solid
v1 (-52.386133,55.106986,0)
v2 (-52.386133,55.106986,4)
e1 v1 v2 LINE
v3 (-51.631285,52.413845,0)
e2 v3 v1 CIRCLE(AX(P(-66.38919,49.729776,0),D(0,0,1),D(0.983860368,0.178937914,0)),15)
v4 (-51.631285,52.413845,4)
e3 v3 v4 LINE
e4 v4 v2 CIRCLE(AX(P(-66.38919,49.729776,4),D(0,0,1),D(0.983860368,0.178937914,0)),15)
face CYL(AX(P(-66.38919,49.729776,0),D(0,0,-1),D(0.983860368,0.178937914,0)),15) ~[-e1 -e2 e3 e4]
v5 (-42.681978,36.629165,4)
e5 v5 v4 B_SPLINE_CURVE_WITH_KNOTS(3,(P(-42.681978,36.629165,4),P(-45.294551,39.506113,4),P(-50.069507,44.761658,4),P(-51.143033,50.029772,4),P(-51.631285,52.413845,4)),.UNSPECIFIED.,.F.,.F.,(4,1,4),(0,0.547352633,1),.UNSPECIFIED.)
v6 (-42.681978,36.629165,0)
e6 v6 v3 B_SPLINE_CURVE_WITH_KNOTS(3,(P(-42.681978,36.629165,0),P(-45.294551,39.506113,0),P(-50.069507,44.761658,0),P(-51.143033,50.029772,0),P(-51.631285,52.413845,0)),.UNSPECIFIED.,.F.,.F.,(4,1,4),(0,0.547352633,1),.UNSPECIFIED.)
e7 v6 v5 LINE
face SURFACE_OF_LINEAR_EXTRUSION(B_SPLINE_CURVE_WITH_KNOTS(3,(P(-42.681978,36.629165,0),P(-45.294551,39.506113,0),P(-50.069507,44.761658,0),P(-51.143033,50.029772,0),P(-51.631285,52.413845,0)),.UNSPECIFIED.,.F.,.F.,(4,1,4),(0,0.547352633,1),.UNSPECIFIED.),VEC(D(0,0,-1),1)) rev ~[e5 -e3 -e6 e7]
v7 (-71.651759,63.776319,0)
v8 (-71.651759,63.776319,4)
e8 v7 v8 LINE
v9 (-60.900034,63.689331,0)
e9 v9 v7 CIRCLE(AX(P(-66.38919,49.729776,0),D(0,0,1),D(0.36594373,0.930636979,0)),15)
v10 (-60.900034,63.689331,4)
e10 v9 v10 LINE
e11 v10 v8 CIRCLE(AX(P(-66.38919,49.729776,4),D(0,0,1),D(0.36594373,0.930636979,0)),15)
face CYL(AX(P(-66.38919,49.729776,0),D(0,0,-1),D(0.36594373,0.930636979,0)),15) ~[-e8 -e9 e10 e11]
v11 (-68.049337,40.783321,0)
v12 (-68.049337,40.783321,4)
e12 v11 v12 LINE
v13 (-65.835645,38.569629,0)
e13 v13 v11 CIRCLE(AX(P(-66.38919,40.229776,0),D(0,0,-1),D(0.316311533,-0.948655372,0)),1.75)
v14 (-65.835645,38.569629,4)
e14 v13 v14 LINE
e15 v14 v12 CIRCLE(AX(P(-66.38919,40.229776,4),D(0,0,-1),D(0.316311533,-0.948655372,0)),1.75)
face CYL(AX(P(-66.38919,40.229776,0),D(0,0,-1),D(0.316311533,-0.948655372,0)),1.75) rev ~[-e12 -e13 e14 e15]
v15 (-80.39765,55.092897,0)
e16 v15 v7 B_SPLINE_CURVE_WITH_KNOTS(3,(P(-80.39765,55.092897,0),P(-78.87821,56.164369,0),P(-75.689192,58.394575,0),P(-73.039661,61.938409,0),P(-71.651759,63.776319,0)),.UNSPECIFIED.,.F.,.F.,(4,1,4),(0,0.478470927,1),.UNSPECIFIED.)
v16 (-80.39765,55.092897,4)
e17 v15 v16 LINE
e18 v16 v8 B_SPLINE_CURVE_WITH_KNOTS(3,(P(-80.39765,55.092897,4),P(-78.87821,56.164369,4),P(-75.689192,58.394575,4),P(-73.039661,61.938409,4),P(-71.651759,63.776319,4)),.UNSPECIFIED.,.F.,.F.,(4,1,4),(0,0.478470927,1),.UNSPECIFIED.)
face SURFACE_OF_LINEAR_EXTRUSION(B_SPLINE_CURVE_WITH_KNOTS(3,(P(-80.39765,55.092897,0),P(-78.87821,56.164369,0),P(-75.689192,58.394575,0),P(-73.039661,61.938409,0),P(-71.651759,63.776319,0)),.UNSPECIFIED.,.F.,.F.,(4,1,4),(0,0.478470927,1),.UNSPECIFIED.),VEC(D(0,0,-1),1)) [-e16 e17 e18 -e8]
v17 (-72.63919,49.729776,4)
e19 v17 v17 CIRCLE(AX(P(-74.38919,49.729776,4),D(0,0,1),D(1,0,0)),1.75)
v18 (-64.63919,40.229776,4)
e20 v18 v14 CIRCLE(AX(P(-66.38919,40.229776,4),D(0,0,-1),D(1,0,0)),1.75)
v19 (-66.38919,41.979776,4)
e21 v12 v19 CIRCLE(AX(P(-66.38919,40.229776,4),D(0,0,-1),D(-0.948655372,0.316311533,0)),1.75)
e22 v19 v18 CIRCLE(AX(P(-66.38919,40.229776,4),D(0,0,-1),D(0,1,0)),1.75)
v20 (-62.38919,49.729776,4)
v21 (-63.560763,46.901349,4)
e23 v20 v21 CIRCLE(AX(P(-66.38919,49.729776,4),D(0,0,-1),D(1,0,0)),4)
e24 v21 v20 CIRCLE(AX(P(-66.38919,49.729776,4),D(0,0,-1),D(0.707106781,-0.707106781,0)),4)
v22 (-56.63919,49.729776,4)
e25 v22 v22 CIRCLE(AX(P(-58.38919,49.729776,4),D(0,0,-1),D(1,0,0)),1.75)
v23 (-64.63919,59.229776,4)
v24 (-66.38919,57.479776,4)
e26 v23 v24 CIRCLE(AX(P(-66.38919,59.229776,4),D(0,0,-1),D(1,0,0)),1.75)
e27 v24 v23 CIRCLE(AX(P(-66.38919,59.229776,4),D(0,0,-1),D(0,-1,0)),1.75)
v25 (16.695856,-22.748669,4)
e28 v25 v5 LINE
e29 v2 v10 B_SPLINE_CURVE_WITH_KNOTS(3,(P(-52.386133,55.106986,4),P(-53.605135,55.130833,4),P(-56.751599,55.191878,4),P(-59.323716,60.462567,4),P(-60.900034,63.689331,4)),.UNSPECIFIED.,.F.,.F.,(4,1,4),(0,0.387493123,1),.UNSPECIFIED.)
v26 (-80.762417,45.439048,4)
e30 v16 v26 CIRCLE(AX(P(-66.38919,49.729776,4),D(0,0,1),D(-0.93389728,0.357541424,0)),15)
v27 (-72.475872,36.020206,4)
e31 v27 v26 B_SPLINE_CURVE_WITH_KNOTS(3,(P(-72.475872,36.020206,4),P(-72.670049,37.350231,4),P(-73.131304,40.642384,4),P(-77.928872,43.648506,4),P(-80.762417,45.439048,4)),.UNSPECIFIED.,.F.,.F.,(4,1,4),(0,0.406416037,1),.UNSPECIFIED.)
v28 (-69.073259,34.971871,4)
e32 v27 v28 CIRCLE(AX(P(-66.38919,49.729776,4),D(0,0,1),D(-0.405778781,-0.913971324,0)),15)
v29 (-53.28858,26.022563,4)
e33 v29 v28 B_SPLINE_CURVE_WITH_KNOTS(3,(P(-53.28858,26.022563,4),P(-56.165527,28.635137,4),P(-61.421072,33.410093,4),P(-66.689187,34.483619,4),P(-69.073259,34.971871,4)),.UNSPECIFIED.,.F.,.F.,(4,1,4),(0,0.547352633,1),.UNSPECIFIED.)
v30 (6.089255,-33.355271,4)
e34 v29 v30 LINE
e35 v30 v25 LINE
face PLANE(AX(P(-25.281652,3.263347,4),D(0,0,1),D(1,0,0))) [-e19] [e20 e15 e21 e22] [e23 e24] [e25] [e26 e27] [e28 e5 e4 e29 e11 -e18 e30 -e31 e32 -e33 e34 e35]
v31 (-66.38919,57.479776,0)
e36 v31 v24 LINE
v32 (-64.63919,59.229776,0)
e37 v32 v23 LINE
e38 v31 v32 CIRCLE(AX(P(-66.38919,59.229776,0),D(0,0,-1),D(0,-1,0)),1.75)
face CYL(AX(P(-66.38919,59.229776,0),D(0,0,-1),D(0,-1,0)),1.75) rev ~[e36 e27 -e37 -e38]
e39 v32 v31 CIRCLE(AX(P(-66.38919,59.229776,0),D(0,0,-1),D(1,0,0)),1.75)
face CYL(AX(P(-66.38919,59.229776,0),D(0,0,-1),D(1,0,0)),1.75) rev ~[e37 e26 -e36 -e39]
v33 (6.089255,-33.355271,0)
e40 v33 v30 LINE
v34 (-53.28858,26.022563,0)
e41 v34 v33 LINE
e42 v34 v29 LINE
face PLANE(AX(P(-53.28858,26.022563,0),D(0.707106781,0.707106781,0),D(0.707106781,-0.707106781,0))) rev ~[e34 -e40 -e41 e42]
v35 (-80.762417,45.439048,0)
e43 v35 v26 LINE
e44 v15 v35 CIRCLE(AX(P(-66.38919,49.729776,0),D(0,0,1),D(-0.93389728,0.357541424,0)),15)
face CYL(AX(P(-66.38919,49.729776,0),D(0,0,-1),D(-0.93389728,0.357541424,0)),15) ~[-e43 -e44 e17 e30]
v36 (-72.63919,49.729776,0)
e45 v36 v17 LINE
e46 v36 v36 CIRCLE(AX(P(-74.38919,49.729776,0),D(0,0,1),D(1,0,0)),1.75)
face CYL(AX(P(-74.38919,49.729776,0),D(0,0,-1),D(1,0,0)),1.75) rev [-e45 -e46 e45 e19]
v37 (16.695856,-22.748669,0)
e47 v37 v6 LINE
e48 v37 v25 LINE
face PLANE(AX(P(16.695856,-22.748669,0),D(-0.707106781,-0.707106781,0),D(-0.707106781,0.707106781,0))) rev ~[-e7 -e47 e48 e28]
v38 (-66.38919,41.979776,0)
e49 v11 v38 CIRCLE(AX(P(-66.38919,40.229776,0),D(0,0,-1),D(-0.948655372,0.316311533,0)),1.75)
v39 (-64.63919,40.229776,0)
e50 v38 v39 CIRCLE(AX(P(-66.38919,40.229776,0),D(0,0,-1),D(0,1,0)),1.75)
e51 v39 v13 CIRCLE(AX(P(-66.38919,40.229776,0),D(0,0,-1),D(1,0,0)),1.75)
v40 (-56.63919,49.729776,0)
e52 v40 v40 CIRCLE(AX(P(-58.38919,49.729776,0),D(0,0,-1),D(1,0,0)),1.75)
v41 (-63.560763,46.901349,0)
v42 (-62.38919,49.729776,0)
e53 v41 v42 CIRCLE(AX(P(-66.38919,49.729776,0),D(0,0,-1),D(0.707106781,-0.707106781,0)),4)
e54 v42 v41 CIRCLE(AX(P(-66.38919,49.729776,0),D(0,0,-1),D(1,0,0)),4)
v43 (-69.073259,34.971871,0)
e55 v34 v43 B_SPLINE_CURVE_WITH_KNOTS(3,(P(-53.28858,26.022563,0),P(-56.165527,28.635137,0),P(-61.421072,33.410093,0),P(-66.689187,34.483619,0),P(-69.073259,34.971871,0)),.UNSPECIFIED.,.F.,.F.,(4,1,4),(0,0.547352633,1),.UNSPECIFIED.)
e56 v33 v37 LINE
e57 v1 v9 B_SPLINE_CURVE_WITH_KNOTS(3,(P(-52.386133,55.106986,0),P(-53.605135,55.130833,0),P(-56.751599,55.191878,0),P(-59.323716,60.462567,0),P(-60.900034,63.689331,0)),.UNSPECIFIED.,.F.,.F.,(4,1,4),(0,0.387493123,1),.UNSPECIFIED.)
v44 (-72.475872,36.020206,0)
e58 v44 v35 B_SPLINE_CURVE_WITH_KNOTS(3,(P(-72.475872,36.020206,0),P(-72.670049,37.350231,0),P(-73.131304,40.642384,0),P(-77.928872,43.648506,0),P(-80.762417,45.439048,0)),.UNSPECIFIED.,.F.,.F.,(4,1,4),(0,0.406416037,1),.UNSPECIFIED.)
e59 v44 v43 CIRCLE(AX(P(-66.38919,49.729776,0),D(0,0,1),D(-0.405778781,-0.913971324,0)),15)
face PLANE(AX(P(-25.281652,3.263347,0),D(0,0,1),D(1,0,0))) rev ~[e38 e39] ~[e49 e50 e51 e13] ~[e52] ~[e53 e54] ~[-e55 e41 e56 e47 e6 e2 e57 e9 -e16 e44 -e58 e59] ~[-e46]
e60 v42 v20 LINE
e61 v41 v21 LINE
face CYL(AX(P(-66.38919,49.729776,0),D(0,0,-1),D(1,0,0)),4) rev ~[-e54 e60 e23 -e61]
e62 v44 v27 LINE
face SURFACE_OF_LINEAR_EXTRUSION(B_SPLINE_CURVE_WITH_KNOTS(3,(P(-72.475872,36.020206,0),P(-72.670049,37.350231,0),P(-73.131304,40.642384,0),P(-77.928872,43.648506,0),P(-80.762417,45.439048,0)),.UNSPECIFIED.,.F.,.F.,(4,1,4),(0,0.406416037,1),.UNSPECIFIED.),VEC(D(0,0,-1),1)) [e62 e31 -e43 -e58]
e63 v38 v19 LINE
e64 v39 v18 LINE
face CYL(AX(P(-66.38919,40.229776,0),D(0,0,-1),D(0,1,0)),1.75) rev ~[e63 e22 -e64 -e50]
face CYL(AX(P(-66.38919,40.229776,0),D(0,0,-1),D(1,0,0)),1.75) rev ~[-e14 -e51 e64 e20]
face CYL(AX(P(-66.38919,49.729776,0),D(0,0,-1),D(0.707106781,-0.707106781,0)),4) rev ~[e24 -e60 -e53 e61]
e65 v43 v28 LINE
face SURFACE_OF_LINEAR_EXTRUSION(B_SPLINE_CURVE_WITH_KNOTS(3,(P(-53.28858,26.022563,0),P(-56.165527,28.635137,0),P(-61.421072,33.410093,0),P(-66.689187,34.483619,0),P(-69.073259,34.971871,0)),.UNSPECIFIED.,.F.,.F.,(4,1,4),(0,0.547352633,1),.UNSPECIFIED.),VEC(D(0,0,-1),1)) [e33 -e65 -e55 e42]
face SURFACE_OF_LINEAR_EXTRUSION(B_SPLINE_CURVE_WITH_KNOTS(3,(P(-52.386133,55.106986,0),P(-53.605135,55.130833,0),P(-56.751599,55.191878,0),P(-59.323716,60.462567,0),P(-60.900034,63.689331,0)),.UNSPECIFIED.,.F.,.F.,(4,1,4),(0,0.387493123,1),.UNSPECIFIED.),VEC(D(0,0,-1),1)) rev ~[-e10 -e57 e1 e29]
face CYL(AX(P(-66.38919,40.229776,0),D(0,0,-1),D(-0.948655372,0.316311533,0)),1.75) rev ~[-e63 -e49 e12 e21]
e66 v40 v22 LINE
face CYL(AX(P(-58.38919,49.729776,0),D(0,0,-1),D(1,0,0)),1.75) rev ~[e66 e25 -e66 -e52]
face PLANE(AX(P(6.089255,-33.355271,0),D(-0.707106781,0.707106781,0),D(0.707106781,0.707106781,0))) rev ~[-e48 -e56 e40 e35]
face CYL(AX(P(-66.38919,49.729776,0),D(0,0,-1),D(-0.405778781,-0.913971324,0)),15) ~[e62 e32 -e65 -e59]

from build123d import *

# Parameters (mm, degrees)
F0_R     = 1.75
F1_DEPTH = 4


with BuildPart() as f1:
    # F0 (on Top) → F1 (new body)
    with BuildSketch(Plane.XY):
        with BuildLine():
            Line((6.0892546755, -33.3552707336), (11.3925555344, -28.0519698747))
            Line((11.3925555344, -28.0519698747), (-9.3547162967, -7.3046980436))
            Line((-9.3547162967, -7.3046980436), (-55.7825886783, 39.1231743381))
            ThreePointArc((-55.7825886783, 39.1231743381), (-58.8891903961, 36.7393949991), (-62.5069047196, 35.2408886615))
            Line((-62.5069047196, 35.2408886615), (-53.2885795254, 26.0225634673))
            Line((-53.2885795254, 26.0225634673), (6.0892546755, -33.3552707336))
        make_face()
        with BuildLine():
            Line((-9.3547162967, -7.3046980436), (11.3925555344, -28.0519698747))
            Line((11.3925555344, -28.0519698747), (16.6958563933, -22.7486690158))
            Line((16.6958563933, -22.7486690158), (-42.6819778076, 36.6291651851))
            add(Edge.make_bspline(
                [(-42.6819778076, 36.6291651851), (-45.2945511903, 39.5061130095), (-50.0695074398, 44.7616576166), (-51.1430333829, 50.0297724966), (-51.6312848813, 52.4138447612)],
                knots=[0, 0, 0, 0, 0.5473526332, 1, 1, 1, 1], degree=3))
            ThreePointArc((-51.6312848813, 52.4138447612), (-51.4017631208, 49.1157535279), (-51.9003030018, 45.8474903793))
            ThreePointArc((-51.9003030018, 45.8474903793), (-53.3988093394, 42.2297760559), (-55.7825886783, 39.1231743381))
            Line((-55.7825886783, 39.1231743381), (-9.3547162967, -7.3046980436))
        make_face()
        with BuildLine():
            ThreePointArc((-62.5069047196, 35.2408886615), (-58.8891903961, 36.7393949991), (-55.7825886783, 39.1231743381))
            ThreePointArc((-55.7825886783, 39.1231743381), (-53.3988093394, 42.2297760559), (-51.9003030018, 45.8474903793))
            ThreePointArc((-51.9003030018, 45.8474903793), (-51.4017631208, 49.1157535279), (-51.6312848813, 52.4138447612))
            ThreePointArc((-51.6312848813, 52.4138447612), (-51.9458010107, 53.7780476698), (-52.3861331822, 55.1069861748))
            add(Edge.make_bspline(
                [(-52.3861331822, 55.1069861748), (-53.6051347333, 55.1308330266), (-56.7515994276, 55.1918775104), (-59.3237157089, 60.4625666695), (-60.9000344454, 63.6893307389)],
                knots=[0, 0, 0, 0, 0.387493123, 1, 1, 1, 1], degree=3))
            ThreePointArc((-60.9000344454, 63.6893307389), (-66.2678346698, 64.7292851408), (-71.6517589086, 63.7763191413))
            add(Edge.make_bspline(
                [(-80.3976496024, 55.0928974107), (-78.8782096295, 56.1643689504), (-75.6891919016, 58.3945745707), (-73.0396610336, 61.9384087083), (-71.6517589086, 63.7763191413)],
                knots=[0, 0, 0, 0, 0.4784709271, 1, 1, 1, 1], degree=3))
            ThreePointArc((-80.3976496024, 55.0928974107), (-81.3784942248, 50.296142309), (-80.7624173443, 45.4390480176))
            add(Edge.make_bspline(
                [(-72.4758721042, 36.0202061945), (-72.6700492153, 37.3502311658), (-73.1313035357, 40.642383964), (-77.9288722558, 43.6485061475), (-80.7624173443, 45.4390480176)],
                knots=[0, 0, 0, 0, 0.4064160365, 1, 1, 1, 1], degree=3))
            ThreePointArc((-72.4758721042, 36.0202061945), (-70.8057804399, 35.3947234788), (-69.0732591015, 34.971870541))
            ThreePointArc((-69.0732591015, 34.971870541), (-65.7751678682, 34.7423487805), (-62.5069047196, 35.2408886615))
        make_face()
        with Locations((-74.3891903961, 49.7297760559)):
            Circle(F0_R, mode=Mode.SUBTRACT)
        with BuildLine():
            ThreePointArc((-64.6391903961, 40.2297760559), (-64.9694713976, 39.2065957368), (-65.8356452136, 38.5696291555))
            ThreePointArc((-65.8356452136, 38.5696291555), (-67.6266272632, 38.9923391888), (-68.0493372965, 40.7833212384))
            ThreePointArc((-68.0493372965, 40.7833212384), (-67.4123707152, 41.6494950544), (-66.3891903961, 41.9797760559))
            ThreePointArc((-66.3891903961, 41.9797760559), (-65.1517535291, 41.4672129229), (-64.6391903961, 40.2297760559))
        make_face(mode=Mode.SUBTRACT)
        with BuildLine():
            ThreePointArc((-62.3891903961, 49.7297760559), (-62.6936722661, 48.1990423264), (-63.5607632714, 46.9013489311))
            ThreePointArc((-63.5607632714, 46.9013489311), (-70.0847085262, 51.2605097853), (-62.3891903961, 49.7297760559))
        make_face(mode=Mode.SUBTRACT)
        with BuildLine():
            ThreePointArc((-60.1391903961, 49.7297760559), (-58.3891903961, 51.4797760559), (-56.6391903961, 49.7297760559))
            ThreePointArc((-56.6391903961, 49.7297760559), (-58.3891903961, 47.9797760559), (-60.1391903961, 49.7297760559))
        make_face(mode=Mode.SUBTRACT)
        with BuildLine():
            ThreePointArc((-66.3891903961, 57.4797760559), (-67.6266272632, 60.4672129229), (-64.6391903961, 59.2297760559))
            ThreePointArc((-64.6391903961, 59.2297760559), (-65.1517535291, 57.9923391888), (-66.3891903961, 57.4797760559))
        make_face(mode=Mode.SUBTRACT)
        with BuildLine():
            add(Edge.make_bspline(
                [(-53.2885795254, 26.0225634673), (-56.1655273498, 28.63513685), (-61.4210719568, 33.4100930995), (-66.6891868368, 34.4836190426), (-69.0732591015, 34.971870541)],
                knots=[0, 0, 0, 0, 0.5473526332, 1, 1, 1, 1], degree=3))
            Line((-53.2885795254, 26.0225634673), (-62.5069047196, 35.2408886615))
            ThreePointArc((-62.5069047196, 35.2408886615), (-65.7751678682, 34.7423487805), (-69.0732591015, 34.971870541))
        make_face()
    extrude(amount=F1_DEPTH)


solid = f1.part
